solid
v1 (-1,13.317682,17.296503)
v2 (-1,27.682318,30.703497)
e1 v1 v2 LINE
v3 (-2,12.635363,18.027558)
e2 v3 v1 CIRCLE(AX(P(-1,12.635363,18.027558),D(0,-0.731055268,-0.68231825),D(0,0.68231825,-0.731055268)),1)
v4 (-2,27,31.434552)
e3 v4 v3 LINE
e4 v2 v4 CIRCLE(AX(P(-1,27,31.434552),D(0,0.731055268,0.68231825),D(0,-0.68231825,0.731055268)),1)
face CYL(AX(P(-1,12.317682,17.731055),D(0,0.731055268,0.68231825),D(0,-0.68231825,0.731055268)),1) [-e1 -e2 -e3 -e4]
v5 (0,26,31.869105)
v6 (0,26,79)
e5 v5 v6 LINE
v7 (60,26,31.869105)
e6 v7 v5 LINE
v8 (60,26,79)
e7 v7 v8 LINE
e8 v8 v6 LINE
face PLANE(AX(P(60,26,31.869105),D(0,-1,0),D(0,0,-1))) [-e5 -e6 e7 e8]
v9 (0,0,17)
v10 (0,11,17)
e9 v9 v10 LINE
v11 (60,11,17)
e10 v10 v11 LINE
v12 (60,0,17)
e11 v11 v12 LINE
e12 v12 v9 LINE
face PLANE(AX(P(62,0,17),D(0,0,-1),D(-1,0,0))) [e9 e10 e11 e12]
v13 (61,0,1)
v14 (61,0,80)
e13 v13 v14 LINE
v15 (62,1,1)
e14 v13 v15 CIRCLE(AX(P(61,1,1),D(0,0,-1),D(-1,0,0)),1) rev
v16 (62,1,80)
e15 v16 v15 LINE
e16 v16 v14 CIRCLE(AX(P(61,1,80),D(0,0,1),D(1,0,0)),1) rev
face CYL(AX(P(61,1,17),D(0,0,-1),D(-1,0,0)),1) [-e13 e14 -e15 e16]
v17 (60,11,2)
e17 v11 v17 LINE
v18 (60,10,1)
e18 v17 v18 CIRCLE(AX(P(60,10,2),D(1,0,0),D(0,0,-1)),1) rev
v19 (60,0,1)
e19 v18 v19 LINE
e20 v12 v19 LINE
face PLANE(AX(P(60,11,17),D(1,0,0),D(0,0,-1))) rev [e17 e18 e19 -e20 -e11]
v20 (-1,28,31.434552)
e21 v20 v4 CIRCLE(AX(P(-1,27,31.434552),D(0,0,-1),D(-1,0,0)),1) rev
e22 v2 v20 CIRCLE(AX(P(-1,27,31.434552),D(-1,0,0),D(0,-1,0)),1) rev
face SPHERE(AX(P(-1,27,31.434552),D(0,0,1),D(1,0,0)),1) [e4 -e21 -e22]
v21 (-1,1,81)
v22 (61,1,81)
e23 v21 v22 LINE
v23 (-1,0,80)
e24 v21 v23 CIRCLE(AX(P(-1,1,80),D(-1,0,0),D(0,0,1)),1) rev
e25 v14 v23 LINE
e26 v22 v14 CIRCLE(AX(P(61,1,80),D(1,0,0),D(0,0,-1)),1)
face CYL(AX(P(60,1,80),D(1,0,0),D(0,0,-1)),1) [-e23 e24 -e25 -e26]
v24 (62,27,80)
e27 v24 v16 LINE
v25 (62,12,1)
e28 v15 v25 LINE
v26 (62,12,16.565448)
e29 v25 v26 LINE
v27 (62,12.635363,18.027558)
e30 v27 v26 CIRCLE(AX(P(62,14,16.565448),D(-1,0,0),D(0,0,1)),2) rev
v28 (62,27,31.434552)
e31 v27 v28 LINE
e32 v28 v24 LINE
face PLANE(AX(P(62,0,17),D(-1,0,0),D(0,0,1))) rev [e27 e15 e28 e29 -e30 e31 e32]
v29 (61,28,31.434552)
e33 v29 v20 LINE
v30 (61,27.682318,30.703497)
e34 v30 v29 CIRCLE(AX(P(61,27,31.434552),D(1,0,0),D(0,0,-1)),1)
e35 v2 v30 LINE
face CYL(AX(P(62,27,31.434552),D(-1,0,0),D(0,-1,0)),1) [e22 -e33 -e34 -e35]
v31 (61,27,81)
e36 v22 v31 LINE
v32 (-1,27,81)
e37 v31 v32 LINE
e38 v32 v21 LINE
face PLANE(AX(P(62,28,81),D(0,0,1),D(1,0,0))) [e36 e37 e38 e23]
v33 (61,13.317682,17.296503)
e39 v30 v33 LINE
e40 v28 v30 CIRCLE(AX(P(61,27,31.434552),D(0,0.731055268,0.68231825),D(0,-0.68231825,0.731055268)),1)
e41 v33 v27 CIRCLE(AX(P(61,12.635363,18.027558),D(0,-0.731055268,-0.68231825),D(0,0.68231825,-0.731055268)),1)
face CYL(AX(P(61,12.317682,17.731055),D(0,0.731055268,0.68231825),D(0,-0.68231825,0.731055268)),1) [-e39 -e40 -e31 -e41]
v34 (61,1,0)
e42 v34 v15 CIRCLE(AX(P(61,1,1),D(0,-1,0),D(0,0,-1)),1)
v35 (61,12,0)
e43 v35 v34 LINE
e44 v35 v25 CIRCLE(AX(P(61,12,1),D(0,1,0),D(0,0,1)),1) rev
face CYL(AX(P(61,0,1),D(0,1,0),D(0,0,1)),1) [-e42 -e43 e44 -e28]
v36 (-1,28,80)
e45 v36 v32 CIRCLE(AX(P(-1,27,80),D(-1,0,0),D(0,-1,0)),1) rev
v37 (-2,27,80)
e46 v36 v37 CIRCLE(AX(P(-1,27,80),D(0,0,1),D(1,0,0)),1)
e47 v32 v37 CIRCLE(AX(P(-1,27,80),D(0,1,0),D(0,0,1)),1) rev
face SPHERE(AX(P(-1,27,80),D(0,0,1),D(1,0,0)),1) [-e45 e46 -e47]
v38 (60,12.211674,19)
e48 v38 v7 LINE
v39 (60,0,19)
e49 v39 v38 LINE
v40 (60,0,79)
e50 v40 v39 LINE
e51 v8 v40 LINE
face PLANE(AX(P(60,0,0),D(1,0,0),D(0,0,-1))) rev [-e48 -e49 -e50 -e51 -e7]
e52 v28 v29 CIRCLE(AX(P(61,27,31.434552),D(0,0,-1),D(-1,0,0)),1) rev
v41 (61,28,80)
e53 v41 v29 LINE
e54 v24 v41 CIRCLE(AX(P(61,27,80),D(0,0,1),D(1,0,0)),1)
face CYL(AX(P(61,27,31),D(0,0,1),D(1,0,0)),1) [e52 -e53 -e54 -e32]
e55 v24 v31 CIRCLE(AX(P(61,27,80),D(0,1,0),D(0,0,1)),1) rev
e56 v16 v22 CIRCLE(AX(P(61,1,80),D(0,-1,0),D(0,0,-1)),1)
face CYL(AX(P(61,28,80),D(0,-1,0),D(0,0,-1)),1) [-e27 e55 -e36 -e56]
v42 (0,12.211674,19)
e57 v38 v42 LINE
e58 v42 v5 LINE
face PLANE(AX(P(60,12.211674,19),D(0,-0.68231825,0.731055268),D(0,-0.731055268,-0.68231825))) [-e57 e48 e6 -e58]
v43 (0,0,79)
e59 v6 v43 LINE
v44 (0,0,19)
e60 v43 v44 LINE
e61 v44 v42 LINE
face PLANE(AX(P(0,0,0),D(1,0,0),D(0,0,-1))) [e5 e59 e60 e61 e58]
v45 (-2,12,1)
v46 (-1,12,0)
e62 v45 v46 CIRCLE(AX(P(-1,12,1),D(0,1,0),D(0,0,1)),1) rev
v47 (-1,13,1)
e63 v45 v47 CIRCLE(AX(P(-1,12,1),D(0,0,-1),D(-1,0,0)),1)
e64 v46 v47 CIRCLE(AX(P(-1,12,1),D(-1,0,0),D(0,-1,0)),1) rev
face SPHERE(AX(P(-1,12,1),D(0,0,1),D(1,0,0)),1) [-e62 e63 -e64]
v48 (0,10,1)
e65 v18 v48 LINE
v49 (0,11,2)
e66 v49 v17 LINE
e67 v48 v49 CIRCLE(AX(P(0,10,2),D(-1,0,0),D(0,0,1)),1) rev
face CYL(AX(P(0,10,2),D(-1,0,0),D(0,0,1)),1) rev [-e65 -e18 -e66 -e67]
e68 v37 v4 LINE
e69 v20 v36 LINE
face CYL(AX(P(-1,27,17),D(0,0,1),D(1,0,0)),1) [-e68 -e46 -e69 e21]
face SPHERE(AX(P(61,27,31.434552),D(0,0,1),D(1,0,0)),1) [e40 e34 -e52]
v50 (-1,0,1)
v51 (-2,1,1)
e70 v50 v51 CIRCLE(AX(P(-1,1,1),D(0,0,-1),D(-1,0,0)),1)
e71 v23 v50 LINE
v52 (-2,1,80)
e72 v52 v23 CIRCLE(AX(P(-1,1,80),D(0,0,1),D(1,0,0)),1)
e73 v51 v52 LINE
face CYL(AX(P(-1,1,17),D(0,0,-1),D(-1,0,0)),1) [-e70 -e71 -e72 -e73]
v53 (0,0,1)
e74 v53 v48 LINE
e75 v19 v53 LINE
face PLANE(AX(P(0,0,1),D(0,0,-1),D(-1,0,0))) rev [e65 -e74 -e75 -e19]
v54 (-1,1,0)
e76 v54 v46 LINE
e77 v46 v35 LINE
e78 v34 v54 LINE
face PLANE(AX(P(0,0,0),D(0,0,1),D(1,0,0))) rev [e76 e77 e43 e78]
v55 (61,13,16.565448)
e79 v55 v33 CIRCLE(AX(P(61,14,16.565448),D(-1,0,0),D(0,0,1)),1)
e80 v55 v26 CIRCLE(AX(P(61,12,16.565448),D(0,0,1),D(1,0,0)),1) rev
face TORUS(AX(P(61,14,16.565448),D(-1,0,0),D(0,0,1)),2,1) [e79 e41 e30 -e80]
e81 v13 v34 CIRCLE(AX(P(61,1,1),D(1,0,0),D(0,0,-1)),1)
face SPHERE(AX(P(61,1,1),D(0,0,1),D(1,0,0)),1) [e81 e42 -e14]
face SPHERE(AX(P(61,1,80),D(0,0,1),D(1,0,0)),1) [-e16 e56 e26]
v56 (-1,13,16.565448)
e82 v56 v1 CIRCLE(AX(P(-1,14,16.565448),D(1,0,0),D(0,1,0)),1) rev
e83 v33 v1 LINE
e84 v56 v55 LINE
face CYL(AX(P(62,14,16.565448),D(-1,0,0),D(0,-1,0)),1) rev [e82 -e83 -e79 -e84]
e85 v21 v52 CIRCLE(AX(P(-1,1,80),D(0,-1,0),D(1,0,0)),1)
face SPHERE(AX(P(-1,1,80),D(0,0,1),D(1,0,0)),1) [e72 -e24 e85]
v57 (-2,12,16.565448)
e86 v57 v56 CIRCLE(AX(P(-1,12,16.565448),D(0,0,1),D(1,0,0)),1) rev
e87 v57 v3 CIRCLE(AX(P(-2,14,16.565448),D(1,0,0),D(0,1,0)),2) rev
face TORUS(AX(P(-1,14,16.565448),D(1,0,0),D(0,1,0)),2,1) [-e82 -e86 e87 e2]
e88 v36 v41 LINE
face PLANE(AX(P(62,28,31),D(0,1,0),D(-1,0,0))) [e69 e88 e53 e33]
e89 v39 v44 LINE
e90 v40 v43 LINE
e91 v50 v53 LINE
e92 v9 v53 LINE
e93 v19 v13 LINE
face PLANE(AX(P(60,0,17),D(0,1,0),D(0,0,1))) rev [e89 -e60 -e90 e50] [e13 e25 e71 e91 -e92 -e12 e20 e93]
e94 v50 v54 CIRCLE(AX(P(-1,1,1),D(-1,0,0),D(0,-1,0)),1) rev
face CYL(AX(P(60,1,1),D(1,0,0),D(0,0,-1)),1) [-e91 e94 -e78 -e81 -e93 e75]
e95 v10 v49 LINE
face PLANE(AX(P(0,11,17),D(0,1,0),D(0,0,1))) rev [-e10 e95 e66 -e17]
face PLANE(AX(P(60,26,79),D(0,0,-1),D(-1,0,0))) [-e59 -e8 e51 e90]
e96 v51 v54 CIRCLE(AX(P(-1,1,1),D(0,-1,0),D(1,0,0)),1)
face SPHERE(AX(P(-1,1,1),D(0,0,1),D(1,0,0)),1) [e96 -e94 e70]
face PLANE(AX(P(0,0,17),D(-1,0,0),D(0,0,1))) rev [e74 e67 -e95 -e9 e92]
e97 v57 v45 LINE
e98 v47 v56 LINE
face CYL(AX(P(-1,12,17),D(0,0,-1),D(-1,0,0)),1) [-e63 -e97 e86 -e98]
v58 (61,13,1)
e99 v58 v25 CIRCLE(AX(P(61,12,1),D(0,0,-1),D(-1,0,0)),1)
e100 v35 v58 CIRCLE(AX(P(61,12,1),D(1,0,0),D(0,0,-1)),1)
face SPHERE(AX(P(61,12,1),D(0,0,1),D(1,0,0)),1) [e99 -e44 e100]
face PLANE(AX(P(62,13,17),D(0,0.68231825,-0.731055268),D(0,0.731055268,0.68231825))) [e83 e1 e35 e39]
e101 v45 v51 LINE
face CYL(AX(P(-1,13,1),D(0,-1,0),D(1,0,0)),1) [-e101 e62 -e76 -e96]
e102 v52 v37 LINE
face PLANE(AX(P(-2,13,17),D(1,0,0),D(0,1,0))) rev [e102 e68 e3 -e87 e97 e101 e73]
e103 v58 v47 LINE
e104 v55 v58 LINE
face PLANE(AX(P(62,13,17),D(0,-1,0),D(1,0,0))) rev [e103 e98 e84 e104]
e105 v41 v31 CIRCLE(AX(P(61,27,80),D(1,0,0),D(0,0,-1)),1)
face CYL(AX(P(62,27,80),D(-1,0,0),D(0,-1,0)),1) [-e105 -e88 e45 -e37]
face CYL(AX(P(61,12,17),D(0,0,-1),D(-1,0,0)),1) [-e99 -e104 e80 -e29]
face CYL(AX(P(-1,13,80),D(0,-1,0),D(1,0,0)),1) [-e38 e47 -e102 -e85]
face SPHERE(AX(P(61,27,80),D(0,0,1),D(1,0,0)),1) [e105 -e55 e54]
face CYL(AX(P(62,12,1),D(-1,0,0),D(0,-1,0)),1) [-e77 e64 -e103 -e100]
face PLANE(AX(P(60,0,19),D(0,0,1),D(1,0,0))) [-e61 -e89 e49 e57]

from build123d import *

# Parameters (mm, degrees)
BOSS_EXTRUDE1_DEPTH = 17
SKETCH2_W           = 60
SKETCH2_H           = 11
BOSS_EXTRUDE2_DEPTH = 1
BOSS_EXTRUDE3_DEPTH = 64
CUT_EXTRUDE1_DEPTH  = 60
FILLET1_R           = 1


with BuildPart() as part:
    # Sketch1 → Boss-Extrude1 (new body)
    with BuildSketch(Plane.XY):
        Polygon((0, 0), (0, 11), (60, 11), (60, 0), (62, 0), (62, 13), (-2, 13), (-2, 0), align=None)
    extrude(amount=BOSS_EXTRUDE1_DEPTH)

    # Sketch2 → Boss-Extrude2 (add)
    with BuildSketch(Plane(origin=(0, 0, 0), x_dir=(-1, 0, 0), z_dir=(0, 0, -1))):
        with Locations((-30, 5.5)):
            Rectangle(SKETCH2_W, SKETCH2_H)
    extrude(amount=-BOSS_EXTRUDE2_DEPTH)

    # Sketch4 → Boss-Extrude3 (add)
    with BuildSketch(Plane.ZY.offset(2)):
        Polygon((17, 13), (31, 28), (81, 28), (81, 0), (17, 0), align=None)
    extrude(amount=-BOSS_EXTRUDE3_DEPTH)

    # Sketch6 → Cut-Extrude1 (cut)
    with BuildSketch(Plane.ZY):
        Polygon((19, 0), (19, 12.211673639), (31.869104604, 26), (79, 26), (79, 0), align=None)
    extrude(amount=-CUT_EXTRUDE1_DEPTH, mode=Mode.SUBTRACT)

    # Fillet1
    fillet1_edges = [part.edges().sort_by_distance(p)[0] for p in [
        (-2, 0, 40.5),
        (-2, 13, 8.5),
        (62, 13, 8.5),
        (62, 0, 40.5),
        (30, 11, 1),
        (30, 13, 17),
        (62, 20.5, 24),
        (62, 28, 56),
        (30, 28, 31),
        (62, 14, 81),
        (30, 28, 81),
        (30, 0, 81),
        (-2, 14, 81),
        (-2, 28, 56),
        (-2, 20.5, 24),
        (-2, 6.5, 0),
        (30, 13, 0),
        (62, 6.5, 0),
        (30, 0, 0),
    ]]
    fillet(fillet1_edges, radius=FILLET1_R - 0.0001)  # a hair under: the kernel refuses the full size


solid = part.part
